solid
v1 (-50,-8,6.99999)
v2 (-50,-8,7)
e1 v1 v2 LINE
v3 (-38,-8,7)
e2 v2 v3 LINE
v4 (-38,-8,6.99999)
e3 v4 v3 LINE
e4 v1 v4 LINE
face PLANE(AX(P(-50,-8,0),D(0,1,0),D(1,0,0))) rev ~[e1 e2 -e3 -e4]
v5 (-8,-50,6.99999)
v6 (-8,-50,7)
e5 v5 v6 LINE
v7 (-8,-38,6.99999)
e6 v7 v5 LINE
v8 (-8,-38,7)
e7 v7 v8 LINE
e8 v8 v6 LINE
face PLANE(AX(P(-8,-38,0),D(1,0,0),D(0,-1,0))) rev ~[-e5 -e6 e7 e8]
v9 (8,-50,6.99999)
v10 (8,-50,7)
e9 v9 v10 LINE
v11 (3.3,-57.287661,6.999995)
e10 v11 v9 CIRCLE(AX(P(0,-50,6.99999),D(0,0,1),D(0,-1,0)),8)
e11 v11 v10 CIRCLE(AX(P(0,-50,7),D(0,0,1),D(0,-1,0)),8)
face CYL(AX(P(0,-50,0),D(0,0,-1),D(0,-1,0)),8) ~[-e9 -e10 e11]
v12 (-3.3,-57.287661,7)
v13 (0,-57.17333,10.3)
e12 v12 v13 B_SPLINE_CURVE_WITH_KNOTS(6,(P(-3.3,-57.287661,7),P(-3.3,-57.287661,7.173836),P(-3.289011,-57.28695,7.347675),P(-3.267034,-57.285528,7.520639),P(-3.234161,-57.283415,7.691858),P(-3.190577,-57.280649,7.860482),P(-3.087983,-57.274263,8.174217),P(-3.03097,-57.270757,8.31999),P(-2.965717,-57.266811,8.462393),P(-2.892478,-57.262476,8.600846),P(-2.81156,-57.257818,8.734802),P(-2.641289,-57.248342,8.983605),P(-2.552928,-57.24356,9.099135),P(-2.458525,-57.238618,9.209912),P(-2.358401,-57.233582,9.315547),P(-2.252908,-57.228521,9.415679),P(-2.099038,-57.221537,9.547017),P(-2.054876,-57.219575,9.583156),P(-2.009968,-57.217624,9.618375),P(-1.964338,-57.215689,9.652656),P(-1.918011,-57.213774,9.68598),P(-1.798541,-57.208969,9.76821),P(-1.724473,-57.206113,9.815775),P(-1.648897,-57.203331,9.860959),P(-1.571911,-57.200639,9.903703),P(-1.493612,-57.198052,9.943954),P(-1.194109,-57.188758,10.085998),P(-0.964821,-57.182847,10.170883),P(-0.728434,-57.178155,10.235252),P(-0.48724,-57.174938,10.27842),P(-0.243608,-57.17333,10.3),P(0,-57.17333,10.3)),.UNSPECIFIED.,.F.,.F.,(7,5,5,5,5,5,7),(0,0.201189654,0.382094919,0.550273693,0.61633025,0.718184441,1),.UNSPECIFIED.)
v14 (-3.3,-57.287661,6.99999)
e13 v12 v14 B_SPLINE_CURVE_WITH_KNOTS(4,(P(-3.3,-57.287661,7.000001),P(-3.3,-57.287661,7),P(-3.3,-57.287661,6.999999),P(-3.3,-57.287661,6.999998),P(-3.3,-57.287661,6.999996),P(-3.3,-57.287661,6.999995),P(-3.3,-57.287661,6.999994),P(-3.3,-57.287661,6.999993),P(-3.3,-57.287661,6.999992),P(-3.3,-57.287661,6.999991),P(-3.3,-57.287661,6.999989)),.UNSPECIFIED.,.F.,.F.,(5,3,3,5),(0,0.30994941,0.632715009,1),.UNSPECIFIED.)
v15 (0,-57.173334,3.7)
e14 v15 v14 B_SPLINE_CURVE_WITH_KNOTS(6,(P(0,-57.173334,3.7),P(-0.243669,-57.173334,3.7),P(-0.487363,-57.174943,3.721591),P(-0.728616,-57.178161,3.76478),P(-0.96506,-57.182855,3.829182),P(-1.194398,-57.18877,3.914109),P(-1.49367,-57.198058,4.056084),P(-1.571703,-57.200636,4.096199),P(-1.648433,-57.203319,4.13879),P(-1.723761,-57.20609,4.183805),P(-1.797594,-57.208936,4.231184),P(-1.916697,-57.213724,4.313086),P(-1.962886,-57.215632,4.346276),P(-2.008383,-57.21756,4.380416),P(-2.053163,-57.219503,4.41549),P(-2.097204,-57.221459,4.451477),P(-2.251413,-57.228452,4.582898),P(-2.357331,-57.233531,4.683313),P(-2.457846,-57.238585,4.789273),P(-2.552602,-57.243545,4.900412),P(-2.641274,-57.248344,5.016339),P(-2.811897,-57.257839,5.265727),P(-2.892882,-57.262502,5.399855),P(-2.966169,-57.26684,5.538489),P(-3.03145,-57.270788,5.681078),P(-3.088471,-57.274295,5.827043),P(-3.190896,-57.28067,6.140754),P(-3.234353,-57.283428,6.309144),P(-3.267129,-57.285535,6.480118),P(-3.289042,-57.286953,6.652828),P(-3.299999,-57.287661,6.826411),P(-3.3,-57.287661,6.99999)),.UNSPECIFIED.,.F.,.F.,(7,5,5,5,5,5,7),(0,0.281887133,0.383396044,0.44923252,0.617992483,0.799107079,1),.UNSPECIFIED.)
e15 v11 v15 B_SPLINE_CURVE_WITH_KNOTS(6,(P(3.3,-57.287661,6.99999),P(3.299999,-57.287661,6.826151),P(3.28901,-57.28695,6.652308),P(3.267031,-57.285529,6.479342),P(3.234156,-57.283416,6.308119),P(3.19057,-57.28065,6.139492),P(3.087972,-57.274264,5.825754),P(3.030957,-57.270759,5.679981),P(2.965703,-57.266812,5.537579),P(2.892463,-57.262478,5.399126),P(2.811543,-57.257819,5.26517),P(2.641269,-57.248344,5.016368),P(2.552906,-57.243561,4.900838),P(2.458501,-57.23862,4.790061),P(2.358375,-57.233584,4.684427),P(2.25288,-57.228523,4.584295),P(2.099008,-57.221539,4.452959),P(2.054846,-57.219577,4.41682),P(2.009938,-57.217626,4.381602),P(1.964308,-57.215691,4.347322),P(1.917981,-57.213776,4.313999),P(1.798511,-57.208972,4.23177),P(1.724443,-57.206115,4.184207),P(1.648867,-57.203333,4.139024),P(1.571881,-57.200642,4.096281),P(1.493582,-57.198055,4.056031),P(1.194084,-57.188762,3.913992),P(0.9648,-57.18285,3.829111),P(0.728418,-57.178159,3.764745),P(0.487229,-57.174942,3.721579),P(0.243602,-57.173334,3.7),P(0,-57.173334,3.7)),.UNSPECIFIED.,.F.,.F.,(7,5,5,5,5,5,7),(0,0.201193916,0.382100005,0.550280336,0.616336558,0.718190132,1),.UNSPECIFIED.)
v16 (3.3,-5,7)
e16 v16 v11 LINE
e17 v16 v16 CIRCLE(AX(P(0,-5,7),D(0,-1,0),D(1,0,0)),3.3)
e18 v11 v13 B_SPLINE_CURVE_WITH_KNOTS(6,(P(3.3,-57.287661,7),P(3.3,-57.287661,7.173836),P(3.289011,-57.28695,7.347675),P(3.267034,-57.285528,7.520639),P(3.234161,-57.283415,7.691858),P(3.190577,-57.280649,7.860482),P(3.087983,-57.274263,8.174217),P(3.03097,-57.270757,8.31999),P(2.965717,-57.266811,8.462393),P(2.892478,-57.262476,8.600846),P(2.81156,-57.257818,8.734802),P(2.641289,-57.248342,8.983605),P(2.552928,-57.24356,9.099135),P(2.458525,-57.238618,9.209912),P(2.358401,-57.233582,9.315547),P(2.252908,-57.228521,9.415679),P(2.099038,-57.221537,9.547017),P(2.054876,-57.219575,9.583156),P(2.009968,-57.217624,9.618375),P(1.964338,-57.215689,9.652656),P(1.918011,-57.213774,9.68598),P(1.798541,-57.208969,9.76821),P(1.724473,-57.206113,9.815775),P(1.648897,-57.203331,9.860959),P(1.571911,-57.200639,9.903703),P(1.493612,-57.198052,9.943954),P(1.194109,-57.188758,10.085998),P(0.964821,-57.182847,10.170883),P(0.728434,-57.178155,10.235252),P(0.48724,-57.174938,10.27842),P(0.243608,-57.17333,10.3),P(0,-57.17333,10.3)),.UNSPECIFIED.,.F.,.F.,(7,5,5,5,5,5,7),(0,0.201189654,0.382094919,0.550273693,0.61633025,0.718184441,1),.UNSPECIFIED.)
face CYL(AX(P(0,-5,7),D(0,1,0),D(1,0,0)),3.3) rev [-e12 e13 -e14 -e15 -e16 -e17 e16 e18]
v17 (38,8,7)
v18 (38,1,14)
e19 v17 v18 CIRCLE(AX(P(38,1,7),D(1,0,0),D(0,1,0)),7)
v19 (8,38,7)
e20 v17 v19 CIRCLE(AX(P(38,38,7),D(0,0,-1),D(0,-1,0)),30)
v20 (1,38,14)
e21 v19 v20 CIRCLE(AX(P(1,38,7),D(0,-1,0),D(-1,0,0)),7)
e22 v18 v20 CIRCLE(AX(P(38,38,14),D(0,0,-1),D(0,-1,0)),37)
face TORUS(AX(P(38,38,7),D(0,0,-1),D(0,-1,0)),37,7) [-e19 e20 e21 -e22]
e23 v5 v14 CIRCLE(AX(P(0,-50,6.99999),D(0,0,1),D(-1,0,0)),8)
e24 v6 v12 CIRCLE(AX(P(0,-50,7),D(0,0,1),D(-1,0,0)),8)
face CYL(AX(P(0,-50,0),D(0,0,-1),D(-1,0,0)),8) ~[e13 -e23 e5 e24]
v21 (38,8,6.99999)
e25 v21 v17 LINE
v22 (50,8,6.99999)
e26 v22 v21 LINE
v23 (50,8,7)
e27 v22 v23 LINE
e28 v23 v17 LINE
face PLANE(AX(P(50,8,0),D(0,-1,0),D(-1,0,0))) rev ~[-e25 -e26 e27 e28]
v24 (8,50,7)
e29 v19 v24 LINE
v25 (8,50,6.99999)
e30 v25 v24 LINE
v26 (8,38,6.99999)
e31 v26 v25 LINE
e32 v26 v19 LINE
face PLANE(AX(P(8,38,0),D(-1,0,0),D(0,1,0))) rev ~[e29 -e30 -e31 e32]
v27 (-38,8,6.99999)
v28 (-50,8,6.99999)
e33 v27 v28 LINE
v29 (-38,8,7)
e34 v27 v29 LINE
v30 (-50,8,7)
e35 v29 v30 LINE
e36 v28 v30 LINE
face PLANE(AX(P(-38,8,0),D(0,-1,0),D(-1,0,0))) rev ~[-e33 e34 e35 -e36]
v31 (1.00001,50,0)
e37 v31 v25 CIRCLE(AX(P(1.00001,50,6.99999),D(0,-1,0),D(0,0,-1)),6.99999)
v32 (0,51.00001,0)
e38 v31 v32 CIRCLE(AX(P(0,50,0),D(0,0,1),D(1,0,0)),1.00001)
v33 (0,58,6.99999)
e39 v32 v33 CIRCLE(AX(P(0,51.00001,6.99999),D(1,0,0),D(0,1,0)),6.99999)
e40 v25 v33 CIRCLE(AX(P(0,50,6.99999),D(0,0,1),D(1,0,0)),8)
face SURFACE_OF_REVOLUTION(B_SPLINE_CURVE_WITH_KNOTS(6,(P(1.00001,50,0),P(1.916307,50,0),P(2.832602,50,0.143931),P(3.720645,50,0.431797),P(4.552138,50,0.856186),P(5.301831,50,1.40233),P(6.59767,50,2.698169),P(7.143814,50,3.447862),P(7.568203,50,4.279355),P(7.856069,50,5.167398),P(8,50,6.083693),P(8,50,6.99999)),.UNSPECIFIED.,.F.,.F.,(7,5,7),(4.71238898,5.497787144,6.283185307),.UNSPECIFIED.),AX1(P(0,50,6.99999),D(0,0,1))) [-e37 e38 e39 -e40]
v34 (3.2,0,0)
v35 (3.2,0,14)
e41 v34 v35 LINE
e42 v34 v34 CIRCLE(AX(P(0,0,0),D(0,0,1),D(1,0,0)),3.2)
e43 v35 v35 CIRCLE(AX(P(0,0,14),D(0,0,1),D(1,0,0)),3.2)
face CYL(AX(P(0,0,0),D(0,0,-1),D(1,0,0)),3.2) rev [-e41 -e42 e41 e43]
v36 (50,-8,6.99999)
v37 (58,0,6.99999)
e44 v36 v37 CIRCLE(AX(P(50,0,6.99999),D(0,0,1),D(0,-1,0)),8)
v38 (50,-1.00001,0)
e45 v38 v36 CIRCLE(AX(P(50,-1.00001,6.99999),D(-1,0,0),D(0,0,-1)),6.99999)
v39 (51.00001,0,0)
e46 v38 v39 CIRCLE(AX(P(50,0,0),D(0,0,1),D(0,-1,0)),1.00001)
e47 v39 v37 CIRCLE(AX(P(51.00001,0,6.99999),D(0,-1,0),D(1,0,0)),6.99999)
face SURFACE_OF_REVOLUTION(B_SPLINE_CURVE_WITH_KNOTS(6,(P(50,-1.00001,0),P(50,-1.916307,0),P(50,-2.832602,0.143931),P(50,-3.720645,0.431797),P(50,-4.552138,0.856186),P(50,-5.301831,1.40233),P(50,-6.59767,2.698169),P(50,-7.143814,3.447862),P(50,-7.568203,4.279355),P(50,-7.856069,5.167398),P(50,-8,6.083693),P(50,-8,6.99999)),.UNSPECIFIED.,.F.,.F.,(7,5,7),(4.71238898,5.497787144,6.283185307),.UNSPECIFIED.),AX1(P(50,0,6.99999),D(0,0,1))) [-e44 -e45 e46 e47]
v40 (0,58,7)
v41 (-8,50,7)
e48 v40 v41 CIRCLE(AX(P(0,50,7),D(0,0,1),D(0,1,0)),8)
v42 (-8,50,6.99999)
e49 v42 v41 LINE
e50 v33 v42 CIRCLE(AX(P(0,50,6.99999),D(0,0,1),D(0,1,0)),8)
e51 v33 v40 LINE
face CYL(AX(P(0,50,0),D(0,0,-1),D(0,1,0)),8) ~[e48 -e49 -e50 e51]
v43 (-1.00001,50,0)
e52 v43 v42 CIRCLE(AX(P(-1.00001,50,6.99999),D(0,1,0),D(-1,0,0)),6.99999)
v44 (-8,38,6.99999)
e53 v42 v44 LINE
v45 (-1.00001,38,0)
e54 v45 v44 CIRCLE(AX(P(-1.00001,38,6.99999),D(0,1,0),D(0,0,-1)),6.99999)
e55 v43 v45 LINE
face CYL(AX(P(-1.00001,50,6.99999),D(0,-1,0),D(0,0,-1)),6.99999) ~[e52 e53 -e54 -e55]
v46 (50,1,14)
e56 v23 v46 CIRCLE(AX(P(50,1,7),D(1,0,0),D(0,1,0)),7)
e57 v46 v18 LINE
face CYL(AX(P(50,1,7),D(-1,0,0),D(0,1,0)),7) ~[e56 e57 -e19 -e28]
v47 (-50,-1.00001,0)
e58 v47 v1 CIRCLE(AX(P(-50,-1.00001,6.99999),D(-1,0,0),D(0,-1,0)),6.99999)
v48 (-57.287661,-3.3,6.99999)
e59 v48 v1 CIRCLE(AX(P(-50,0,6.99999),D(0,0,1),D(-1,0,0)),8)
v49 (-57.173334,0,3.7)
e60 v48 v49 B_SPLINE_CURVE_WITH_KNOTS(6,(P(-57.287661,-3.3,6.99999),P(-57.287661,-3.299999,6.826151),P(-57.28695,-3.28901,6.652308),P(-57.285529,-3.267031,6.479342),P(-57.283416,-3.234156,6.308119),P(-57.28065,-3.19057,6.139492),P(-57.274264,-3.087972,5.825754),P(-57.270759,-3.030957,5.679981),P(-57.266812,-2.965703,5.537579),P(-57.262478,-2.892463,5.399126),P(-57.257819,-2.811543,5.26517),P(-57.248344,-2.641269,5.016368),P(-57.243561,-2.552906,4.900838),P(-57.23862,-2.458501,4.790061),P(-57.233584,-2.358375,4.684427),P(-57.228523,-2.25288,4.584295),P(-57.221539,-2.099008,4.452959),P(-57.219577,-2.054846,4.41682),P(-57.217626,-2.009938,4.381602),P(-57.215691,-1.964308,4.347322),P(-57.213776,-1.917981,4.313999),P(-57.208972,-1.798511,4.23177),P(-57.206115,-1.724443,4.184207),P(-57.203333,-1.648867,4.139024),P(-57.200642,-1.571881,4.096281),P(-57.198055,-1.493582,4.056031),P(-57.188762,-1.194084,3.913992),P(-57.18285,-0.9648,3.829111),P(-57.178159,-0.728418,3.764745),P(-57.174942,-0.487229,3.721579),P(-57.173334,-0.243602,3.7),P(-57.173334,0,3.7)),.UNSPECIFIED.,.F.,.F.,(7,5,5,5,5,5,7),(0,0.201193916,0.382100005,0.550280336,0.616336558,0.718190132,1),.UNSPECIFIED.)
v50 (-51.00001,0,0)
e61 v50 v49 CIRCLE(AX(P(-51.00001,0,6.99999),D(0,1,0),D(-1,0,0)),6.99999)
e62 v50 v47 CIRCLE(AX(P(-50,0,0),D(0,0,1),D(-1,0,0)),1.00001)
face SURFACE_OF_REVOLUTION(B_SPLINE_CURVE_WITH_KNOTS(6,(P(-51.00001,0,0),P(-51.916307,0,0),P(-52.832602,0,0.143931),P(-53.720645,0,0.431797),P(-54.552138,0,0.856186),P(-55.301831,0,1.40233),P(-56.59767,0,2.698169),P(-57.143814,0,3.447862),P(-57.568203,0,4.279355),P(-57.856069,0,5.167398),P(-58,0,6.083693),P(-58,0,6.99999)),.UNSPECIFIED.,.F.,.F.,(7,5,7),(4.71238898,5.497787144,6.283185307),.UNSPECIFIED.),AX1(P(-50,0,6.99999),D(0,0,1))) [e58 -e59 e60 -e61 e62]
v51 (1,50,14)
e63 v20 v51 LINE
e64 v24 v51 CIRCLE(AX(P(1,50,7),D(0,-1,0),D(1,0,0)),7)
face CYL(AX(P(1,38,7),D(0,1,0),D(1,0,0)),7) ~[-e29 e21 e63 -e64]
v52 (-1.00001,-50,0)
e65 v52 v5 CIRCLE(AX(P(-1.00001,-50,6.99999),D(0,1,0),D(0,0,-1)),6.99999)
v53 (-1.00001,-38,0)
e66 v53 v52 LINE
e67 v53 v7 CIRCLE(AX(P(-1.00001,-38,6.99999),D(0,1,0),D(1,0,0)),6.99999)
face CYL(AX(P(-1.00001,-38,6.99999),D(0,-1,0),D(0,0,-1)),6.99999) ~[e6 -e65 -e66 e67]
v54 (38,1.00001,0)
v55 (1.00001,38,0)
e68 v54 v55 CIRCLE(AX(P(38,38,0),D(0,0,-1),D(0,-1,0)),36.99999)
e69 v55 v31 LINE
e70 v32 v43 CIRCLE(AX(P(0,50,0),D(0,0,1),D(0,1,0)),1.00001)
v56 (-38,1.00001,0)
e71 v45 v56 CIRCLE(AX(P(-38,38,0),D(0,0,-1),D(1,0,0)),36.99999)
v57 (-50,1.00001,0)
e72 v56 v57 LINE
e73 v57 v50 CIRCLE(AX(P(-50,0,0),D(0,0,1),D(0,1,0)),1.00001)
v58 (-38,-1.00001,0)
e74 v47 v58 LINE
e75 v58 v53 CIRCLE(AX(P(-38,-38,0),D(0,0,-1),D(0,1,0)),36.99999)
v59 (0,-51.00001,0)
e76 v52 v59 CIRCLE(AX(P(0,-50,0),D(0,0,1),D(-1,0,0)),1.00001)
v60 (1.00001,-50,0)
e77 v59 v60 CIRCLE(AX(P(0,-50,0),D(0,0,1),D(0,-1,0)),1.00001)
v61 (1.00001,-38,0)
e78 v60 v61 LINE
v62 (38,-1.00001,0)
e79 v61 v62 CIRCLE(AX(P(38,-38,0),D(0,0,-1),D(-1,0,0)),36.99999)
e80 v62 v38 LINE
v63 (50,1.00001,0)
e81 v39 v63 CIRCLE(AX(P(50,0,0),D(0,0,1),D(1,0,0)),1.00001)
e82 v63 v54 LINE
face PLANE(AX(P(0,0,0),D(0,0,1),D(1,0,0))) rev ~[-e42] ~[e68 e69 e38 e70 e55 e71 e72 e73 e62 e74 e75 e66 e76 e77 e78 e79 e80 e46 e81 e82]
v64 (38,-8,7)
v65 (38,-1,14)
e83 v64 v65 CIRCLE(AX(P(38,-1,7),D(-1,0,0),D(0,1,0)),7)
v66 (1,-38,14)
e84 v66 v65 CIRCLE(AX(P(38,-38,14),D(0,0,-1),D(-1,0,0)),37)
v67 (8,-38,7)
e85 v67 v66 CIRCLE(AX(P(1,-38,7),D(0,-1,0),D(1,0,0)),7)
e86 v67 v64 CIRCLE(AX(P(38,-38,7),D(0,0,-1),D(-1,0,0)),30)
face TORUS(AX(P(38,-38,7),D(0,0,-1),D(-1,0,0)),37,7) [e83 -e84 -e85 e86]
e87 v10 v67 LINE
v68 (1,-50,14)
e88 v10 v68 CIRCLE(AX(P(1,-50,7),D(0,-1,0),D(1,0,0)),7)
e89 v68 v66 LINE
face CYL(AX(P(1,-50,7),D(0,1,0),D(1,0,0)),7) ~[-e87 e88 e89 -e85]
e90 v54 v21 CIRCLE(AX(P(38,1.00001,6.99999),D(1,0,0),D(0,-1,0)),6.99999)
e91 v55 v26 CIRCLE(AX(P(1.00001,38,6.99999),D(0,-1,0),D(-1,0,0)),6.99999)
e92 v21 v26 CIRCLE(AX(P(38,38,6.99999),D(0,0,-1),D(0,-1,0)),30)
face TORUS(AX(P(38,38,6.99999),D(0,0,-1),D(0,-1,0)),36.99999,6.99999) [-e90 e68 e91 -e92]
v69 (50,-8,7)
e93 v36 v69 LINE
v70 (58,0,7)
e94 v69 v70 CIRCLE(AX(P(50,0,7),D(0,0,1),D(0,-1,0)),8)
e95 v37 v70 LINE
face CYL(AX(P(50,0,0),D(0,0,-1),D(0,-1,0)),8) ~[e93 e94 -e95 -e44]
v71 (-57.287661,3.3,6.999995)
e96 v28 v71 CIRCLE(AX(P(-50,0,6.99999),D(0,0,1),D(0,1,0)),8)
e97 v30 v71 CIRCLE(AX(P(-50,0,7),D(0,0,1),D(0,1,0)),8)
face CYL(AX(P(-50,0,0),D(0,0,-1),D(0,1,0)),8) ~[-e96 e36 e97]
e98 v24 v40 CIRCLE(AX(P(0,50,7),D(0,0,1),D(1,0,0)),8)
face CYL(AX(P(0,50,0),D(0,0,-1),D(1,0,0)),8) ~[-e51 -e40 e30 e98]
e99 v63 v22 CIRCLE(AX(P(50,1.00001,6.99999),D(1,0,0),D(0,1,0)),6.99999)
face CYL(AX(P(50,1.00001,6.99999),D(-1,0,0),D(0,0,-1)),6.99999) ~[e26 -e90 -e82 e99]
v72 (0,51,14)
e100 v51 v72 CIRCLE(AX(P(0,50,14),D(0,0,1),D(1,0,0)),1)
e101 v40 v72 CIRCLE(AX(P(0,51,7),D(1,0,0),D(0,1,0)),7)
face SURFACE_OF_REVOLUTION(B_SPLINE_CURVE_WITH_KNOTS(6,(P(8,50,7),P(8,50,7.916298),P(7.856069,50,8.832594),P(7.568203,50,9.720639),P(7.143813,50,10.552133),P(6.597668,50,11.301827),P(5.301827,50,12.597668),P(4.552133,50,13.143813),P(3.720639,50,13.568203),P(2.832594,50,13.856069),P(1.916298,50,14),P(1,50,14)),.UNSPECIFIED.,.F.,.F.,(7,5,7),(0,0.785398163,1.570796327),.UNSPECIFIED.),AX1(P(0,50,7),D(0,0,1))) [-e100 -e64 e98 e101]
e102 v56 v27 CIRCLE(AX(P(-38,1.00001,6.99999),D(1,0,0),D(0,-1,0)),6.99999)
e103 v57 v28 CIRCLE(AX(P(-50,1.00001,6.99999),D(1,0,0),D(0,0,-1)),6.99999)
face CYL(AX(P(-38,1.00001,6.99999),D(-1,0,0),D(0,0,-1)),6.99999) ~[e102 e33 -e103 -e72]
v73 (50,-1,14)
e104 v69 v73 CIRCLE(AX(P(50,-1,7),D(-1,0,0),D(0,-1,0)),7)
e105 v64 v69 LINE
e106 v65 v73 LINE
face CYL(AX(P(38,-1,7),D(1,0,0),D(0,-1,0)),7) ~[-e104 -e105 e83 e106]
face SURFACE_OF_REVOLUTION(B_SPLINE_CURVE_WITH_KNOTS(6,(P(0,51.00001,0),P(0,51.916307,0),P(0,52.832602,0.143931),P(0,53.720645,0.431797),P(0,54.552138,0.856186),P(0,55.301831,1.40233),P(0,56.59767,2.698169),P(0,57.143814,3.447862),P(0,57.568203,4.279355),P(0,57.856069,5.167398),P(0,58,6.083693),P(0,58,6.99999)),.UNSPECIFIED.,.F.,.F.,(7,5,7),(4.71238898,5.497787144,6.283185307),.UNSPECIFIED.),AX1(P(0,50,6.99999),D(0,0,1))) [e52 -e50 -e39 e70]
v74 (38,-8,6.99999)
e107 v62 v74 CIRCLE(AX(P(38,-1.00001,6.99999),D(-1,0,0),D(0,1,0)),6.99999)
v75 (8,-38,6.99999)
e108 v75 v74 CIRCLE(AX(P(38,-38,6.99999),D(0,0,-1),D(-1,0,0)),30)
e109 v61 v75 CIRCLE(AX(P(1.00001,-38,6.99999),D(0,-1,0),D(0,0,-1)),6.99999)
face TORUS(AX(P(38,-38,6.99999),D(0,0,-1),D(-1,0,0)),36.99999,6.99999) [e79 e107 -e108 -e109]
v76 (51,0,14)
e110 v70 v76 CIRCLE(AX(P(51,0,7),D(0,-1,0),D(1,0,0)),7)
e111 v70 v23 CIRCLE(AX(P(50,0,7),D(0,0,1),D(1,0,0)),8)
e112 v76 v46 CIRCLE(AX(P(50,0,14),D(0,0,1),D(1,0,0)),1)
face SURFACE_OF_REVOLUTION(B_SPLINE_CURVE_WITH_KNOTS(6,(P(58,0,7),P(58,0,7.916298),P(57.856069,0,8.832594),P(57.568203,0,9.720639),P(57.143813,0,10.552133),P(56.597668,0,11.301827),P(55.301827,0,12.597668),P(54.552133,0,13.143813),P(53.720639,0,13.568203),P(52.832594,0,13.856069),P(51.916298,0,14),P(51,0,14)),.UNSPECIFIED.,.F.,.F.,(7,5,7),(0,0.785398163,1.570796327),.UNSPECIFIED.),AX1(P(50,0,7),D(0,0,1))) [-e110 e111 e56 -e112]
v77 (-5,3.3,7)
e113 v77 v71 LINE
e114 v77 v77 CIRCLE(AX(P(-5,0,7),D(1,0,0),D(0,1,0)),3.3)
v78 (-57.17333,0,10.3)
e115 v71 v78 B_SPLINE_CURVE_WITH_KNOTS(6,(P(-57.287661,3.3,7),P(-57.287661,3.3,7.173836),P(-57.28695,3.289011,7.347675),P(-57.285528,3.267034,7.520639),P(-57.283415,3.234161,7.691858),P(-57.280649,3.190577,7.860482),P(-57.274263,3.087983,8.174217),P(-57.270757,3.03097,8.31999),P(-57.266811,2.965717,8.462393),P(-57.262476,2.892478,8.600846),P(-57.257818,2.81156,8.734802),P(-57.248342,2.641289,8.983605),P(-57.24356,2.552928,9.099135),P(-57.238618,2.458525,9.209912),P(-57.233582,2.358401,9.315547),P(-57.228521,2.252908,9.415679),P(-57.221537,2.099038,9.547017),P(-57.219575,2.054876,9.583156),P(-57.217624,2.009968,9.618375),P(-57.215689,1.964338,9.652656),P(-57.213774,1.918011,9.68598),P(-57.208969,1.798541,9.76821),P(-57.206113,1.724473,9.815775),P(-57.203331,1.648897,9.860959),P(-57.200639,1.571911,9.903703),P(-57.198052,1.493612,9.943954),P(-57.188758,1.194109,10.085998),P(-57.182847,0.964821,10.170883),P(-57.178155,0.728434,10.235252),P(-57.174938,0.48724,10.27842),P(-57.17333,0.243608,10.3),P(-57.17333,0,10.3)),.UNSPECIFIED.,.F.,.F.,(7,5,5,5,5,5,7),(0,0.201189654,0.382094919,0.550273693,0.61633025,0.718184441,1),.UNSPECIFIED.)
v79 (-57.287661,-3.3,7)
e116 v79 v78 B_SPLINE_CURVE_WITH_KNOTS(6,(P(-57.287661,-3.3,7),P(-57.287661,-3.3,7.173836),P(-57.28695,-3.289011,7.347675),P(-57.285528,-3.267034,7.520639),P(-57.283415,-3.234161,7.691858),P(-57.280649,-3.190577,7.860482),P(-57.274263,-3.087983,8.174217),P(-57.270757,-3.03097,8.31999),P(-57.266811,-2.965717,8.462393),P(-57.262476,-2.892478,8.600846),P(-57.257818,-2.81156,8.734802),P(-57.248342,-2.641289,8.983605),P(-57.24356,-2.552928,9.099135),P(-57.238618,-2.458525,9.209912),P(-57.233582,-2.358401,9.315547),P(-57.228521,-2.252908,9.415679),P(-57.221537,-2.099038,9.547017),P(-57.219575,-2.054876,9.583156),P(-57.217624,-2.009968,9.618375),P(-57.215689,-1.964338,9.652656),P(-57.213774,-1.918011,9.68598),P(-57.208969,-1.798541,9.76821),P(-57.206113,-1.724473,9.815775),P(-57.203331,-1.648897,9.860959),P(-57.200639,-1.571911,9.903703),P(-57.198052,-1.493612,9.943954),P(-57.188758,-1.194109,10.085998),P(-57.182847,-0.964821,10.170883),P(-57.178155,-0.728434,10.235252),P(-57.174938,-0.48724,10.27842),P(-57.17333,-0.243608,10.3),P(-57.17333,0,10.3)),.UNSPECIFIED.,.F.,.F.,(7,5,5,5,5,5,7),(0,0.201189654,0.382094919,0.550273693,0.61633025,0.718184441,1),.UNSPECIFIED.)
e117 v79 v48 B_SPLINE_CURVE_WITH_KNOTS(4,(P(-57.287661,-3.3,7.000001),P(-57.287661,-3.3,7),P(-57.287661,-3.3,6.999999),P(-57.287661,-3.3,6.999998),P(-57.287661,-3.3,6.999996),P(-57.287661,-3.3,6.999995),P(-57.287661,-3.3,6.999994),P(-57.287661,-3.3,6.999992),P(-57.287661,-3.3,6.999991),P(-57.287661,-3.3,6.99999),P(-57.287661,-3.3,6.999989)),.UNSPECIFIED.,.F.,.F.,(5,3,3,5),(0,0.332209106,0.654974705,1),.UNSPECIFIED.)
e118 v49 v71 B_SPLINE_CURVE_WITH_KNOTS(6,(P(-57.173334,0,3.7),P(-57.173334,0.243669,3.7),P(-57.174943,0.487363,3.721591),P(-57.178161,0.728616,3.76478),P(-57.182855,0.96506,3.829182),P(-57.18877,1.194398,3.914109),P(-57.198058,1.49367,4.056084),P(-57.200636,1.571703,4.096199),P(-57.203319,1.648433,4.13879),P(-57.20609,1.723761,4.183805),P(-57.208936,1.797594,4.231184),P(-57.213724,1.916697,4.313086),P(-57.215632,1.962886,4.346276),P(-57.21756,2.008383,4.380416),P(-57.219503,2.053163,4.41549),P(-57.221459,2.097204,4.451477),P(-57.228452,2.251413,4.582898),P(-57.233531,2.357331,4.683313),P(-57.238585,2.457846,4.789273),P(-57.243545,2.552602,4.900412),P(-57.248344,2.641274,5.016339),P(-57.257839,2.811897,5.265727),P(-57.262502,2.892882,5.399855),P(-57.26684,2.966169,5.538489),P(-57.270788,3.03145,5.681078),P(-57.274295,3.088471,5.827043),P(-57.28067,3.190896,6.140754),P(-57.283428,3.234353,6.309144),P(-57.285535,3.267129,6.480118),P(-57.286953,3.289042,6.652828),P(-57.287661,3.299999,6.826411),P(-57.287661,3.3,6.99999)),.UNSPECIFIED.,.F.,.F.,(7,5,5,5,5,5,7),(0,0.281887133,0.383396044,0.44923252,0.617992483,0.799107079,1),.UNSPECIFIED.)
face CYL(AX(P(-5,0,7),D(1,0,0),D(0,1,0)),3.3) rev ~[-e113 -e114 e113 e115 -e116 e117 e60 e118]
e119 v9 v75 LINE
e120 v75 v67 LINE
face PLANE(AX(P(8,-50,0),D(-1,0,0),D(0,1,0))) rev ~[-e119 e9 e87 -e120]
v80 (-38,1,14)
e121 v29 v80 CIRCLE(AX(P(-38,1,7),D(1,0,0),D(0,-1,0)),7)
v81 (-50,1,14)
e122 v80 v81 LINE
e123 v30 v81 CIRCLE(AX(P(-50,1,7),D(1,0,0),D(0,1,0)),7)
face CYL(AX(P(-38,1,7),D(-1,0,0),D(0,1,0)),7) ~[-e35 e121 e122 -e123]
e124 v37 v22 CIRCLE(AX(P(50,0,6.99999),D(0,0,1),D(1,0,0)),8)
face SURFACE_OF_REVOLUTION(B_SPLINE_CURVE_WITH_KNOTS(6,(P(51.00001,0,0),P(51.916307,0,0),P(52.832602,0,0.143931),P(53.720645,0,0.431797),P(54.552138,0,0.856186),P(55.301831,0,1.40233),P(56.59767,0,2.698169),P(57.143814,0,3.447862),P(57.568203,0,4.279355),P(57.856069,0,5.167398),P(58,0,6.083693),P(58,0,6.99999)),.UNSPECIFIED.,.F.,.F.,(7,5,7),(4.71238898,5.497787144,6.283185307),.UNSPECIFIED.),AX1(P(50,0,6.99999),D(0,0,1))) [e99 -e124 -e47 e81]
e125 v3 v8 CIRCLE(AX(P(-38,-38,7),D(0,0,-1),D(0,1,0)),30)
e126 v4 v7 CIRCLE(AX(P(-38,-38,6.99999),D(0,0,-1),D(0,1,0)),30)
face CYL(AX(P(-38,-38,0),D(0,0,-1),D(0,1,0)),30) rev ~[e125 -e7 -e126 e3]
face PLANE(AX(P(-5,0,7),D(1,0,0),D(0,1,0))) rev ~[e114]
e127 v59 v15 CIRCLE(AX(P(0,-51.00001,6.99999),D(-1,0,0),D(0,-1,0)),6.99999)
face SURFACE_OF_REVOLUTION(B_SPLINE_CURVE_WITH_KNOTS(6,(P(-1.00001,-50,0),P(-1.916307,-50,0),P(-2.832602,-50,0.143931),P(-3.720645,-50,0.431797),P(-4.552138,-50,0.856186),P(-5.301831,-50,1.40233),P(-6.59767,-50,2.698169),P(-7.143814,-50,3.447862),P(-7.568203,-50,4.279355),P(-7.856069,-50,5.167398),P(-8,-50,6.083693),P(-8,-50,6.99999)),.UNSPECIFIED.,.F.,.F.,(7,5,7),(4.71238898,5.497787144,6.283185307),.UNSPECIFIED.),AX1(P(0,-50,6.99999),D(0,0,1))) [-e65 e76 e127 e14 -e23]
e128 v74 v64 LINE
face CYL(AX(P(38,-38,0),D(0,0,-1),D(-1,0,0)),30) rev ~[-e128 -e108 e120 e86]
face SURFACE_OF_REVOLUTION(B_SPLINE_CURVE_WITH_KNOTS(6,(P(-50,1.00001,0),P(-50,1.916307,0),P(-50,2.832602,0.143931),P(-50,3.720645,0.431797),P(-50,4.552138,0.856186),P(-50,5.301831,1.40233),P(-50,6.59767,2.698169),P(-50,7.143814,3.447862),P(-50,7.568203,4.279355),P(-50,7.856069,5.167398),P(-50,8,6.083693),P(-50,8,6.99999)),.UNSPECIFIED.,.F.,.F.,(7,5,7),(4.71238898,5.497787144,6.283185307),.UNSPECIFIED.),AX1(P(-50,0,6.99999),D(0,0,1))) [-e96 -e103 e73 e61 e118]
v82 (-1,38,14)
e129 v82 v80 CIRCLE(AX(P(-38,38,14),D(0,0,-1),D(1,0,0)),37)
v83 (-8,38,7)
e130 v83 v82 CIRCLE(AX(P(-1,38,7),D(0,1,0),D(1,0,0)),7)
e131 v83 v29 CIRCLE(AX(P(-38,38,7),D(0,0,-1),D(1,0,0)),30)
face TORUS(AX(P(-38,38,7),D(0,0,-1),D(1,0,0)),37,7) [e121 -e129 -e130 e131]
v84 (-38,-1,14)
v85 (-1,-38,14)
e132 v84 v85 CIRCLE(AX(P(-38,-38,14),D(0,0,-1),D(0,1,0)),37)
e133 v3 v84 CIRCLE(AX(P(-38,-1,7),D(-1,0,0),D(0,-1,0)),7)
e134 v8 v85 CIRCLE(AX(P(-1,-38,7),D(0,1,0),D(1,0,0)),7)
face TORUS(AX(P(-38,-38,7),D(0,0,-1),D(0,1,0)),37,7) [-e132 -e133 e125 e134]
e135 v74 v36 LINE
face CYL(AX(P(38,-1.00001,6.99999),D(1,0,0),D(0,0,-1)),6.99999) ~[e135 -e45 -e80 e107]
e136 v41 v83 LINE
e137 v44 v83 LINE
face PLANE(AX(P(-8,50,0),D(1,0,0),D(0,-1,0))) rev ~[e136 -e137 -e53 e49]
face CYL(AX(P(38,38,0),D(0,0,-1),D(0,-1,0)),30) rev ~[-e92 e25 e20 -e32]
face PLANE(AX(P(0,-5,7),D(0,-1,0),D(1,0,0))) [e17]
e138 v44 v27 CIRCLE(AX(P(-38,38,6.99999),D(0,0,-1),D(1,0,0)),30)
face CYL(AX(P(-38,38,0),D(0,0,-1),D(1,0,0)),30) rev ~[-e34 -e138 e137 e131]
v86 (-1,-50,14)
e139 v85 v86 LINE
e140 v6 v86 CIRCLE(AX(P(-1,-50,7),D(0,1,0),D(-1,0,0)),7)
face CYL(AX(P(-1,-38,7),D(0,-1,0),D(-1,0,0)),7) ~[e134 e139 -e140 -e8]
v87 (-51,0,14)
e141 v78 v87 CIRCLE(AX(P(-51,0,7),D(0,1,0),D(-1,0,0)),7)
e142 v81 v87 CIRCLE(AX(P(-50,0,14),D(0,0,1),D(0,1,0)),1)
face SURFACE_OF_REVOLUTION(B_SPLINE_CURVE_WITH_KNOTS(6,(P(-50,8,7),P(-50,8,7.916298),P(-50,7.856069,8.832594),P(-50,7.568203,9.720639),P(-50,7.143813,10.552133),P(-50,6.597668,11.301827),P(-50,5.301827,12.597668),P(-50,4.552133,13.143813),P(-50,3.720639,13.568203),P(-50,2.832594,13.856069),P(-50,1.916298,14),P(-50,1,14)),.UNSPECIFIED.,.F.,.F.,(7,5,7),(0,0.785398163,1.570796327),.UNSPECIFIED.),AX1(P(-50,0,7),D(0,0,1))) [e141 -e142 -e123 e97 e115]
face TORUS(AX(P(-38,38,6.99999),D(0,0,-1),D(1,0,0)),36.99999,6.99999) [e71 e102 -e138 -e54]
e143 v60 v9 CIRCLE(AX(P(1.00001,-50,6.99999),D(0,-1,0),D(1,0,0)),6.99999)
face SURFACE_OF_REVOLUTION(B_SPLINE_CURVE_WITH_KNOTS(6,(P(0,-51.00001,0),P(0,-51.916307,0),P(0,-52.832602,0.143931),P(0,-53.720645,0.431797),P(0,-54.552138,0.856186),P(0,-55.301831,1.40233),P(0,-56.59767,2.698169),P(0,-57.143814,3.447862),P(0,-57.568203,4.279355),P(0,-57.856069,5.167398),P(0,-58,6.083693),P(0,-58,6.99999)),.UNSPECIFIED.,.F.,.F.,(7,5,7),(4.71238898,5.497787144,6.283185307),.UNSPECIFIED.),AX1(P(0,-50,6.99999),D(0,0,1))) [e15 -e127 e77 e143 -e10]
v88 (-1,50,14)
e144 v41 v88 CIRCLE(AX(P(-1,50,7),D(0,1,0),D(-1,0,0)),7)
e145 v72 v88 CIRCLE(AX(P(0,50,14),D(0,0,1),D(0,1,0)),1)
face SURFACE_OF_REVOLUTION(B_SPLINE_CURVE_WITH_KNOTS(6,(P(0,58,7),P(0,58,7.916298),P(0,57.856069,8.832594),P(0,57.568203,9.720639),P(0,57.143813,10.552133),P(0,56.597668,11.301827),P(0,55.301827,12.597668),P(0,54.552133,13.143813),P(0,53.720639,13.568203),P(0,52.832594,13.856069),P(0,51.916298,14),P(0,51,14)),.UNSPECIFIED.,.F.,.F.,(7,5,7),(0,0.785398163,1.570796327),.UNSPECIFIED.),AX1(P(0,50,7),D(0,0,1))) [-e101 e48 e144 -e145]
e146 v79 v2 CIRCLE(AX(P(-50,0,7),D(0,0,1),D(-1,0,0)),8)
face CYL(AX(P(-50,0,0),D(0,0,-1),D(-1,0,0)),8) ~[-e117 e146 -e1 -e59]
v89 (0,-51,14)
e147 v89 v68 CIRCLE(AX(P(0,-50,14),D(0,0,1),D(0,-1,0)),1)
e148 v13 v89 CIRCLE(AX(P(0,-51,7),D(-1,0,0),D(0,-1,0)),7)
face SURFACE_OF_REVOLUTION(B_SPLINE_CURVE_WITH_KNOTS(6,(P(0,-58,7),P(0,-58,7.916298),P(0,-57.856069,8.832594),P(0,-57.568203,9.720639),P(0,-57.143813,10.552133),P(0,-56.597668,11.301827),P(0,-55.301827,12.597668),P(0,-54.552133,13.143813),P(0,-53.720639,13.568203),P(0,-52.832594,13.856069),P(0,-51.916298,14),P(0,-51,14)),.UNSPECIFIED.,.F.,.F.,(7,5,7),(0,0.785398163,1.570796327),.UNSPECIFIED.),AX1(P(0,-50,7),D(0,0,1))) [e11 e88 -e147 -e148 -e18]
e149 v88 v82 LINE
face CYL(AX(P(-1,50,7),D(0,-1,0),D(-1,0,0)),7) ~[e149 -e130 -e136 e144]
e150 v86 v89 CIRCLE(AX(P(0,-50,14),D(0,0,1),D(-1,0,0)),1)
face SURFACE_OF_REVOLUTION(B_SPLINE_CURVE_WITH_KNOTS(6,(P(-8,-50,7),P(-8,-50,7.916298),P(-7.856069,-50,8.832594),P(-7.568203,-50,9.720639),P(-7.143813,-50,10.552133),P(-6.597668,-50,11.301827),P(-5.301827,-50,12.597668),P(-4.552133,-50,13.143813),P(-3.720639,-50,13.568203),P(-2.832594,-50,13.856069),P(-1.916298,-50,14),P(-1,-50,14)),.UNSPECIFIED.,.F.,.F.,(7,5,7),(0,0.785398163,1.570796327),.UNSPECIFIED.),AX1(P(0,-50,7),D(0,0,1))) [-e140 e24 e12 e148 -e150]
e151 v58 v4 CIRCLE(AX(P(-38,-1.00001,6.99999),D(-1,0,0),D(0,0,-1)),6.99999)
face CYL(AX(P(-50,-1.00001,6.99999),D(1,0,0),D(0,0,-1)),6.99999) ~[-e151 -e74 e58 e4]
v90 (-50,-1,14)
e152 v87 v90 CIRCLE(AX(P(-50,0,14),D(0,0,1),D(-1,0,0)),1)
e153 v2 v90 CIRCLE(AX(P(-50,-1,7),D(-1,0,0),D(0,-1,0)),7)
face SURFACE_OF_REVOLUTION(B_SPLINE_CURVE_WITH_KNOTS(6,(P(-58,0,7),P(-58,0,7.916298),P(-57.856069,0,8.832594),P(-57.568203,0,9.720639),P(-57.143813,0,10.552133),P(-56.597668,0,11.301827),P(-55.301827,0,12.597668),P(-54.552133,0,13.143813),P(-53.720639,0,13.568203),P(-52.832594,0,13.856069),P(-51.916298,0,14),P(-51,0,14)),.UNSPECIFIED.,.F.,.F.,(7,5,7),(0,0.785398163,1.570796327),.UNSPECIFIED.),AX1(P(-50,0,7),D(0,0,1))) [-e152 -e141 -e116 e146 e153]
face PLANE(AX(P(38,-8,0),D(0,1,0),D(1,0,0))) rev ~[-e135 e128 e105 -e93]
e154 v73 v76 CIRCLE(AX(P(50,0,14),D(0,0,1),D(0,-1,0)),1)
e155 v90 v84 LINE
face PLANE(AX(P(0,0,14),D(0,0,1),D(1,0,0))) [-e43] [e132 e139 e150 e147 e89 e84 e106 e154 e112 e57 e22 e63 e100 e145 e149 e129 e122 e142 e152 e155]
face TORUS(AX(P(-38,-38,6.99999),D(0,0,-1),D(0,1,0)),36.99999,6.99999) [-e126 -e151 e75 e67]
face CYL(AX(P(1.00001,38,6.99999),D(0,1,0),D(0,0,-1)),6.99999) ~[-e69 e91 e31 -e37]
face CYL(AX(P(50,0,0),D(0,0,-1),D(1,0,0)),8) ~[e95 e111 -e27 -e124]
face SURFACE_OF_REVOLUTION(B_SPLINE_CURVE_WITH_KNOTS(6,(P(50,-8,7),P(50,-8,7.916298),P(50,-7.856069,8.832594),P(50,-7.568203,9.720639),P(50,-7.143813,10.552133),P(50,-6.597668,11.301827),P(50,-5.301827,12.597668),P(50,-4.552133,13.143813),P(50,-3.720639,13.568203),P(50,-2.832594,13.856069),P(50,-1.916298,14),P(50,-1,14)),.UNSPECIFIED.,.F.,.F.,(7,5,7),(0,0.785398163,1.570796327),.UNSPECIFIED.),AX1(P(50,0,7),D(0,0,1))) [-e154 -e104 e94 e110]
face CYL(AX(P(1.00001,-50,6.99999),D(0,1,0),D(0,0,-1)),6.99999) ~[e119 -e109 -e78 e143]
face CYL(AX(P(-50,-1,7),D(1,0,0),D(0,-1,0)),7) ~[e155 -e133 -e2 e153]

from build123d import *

# Parameters (mm, degrees)
F0_R     = 3.2
F1_DEPTH = 14
F2_R     = 7
F3_R     = 6.99999
F5_START = 5
F4_R     = 3.3
F5_DEPTH = 60
F7_START = -5
F6_R     = 3.3
F7_DEPTH = 60


# Not quite as in the source:
# - a fillet or chamfer is up to 0.001 mm smaller than in the source, because OpenCascade refuses the exact size


with BuildPart() as f1:
    # F0 (on Top) → F1 (new body)
    with BuildSketch(Plane.XY):
        with BuildLine():
            ThreePointArc((0, 58), (-5.6568542495, 55.6568542495), (-8, 50))
            Line((-8, 50), (-8, 38))
            ThreePointArc((-8, 38), (-16.7867965644, 16.7867965644), (-38, 8))
            Line((-38, 8), (-50, 8))
            ThreePointArc((-50, 8), (-55.6568542495, 5.6568542495), (-58, 0))
            ThreePointArc((-58, 0), (-55.6568542495, -5.6568542495), (-50, -8))
            Line((-50, -8), (-38, -8))
            ThreePointArc((-38, -8), (-16.7867965644, -16.7867965644), (-8, -38))
            Line((-8, -38), (-8, -50))
            ThreePointArc((-8, -50), (-5.6568542495, -55.6568542495), (0, -58))
            ThreePointArc((0, -58), (5.6568542495, -55.6568542495), (8, -50))
            Line((8, -50), (8, -38))
            ThreePointArc((8, -38), (16.7867965644, -16.7867965644), (38, -8))
            Line((38, -8), (50, -8))
            ThreePointArc((50, -8), (55.6568542495, -5.6568542495), (58, 0))
            ThreePointArc((58, 0), (55.6568542495, 5.6568542495), (50, 8))
            Line((50, 8), (38, 8))
            ThreePointArc((38, 8), (16.7867965644, 16.7867965644), (8, 38))
            Line((8, 38), (8, 50))
            ThreePointArc((8, 50), (5.6568542495, 55.6568542495), (0, 58))
        make_face()
        Circle(F0_R, mode=Mode.SUBTRACT)
    extrude(amount=F1_DEPTH)

    # F2
    f2_edges = [f1.edges().sort_by_distance(p)[0] for p in [
        (-16.786797, 16.786797, 14),
    ]]
    fillet(f2_edges, radius=F2_R)

    # F3 (radius 7 in the source; OpenCascade refuses exactly that, so slightly less here)
    f3_edges = [f1.edges().sort_by_distance(p)[0] for p in [
        (16.786797, 16.786797, 0),
    ]]
    fillet(f3_edges, radius=F3_R)

    # F4 (on Front) → F5 (cut)
    with BuildSketch(Plane.XZ.offset(F5_START)):
        with Locations((0, 7)):
            Circle(F4_R)
    extrude(amount=F5_DEPTH, mode=Mode.SUBTRACT)

    # F6 (on Right) → F7 (cut)
    with BuildSketch(Plane.YZ.offset(F7_START)):
        with Locations((0, 7)):
            Circle(F6_R)
    extrude(amount=-F7_DEPTH, mode=Mode.SUBTRACT)


solid = f1.part
